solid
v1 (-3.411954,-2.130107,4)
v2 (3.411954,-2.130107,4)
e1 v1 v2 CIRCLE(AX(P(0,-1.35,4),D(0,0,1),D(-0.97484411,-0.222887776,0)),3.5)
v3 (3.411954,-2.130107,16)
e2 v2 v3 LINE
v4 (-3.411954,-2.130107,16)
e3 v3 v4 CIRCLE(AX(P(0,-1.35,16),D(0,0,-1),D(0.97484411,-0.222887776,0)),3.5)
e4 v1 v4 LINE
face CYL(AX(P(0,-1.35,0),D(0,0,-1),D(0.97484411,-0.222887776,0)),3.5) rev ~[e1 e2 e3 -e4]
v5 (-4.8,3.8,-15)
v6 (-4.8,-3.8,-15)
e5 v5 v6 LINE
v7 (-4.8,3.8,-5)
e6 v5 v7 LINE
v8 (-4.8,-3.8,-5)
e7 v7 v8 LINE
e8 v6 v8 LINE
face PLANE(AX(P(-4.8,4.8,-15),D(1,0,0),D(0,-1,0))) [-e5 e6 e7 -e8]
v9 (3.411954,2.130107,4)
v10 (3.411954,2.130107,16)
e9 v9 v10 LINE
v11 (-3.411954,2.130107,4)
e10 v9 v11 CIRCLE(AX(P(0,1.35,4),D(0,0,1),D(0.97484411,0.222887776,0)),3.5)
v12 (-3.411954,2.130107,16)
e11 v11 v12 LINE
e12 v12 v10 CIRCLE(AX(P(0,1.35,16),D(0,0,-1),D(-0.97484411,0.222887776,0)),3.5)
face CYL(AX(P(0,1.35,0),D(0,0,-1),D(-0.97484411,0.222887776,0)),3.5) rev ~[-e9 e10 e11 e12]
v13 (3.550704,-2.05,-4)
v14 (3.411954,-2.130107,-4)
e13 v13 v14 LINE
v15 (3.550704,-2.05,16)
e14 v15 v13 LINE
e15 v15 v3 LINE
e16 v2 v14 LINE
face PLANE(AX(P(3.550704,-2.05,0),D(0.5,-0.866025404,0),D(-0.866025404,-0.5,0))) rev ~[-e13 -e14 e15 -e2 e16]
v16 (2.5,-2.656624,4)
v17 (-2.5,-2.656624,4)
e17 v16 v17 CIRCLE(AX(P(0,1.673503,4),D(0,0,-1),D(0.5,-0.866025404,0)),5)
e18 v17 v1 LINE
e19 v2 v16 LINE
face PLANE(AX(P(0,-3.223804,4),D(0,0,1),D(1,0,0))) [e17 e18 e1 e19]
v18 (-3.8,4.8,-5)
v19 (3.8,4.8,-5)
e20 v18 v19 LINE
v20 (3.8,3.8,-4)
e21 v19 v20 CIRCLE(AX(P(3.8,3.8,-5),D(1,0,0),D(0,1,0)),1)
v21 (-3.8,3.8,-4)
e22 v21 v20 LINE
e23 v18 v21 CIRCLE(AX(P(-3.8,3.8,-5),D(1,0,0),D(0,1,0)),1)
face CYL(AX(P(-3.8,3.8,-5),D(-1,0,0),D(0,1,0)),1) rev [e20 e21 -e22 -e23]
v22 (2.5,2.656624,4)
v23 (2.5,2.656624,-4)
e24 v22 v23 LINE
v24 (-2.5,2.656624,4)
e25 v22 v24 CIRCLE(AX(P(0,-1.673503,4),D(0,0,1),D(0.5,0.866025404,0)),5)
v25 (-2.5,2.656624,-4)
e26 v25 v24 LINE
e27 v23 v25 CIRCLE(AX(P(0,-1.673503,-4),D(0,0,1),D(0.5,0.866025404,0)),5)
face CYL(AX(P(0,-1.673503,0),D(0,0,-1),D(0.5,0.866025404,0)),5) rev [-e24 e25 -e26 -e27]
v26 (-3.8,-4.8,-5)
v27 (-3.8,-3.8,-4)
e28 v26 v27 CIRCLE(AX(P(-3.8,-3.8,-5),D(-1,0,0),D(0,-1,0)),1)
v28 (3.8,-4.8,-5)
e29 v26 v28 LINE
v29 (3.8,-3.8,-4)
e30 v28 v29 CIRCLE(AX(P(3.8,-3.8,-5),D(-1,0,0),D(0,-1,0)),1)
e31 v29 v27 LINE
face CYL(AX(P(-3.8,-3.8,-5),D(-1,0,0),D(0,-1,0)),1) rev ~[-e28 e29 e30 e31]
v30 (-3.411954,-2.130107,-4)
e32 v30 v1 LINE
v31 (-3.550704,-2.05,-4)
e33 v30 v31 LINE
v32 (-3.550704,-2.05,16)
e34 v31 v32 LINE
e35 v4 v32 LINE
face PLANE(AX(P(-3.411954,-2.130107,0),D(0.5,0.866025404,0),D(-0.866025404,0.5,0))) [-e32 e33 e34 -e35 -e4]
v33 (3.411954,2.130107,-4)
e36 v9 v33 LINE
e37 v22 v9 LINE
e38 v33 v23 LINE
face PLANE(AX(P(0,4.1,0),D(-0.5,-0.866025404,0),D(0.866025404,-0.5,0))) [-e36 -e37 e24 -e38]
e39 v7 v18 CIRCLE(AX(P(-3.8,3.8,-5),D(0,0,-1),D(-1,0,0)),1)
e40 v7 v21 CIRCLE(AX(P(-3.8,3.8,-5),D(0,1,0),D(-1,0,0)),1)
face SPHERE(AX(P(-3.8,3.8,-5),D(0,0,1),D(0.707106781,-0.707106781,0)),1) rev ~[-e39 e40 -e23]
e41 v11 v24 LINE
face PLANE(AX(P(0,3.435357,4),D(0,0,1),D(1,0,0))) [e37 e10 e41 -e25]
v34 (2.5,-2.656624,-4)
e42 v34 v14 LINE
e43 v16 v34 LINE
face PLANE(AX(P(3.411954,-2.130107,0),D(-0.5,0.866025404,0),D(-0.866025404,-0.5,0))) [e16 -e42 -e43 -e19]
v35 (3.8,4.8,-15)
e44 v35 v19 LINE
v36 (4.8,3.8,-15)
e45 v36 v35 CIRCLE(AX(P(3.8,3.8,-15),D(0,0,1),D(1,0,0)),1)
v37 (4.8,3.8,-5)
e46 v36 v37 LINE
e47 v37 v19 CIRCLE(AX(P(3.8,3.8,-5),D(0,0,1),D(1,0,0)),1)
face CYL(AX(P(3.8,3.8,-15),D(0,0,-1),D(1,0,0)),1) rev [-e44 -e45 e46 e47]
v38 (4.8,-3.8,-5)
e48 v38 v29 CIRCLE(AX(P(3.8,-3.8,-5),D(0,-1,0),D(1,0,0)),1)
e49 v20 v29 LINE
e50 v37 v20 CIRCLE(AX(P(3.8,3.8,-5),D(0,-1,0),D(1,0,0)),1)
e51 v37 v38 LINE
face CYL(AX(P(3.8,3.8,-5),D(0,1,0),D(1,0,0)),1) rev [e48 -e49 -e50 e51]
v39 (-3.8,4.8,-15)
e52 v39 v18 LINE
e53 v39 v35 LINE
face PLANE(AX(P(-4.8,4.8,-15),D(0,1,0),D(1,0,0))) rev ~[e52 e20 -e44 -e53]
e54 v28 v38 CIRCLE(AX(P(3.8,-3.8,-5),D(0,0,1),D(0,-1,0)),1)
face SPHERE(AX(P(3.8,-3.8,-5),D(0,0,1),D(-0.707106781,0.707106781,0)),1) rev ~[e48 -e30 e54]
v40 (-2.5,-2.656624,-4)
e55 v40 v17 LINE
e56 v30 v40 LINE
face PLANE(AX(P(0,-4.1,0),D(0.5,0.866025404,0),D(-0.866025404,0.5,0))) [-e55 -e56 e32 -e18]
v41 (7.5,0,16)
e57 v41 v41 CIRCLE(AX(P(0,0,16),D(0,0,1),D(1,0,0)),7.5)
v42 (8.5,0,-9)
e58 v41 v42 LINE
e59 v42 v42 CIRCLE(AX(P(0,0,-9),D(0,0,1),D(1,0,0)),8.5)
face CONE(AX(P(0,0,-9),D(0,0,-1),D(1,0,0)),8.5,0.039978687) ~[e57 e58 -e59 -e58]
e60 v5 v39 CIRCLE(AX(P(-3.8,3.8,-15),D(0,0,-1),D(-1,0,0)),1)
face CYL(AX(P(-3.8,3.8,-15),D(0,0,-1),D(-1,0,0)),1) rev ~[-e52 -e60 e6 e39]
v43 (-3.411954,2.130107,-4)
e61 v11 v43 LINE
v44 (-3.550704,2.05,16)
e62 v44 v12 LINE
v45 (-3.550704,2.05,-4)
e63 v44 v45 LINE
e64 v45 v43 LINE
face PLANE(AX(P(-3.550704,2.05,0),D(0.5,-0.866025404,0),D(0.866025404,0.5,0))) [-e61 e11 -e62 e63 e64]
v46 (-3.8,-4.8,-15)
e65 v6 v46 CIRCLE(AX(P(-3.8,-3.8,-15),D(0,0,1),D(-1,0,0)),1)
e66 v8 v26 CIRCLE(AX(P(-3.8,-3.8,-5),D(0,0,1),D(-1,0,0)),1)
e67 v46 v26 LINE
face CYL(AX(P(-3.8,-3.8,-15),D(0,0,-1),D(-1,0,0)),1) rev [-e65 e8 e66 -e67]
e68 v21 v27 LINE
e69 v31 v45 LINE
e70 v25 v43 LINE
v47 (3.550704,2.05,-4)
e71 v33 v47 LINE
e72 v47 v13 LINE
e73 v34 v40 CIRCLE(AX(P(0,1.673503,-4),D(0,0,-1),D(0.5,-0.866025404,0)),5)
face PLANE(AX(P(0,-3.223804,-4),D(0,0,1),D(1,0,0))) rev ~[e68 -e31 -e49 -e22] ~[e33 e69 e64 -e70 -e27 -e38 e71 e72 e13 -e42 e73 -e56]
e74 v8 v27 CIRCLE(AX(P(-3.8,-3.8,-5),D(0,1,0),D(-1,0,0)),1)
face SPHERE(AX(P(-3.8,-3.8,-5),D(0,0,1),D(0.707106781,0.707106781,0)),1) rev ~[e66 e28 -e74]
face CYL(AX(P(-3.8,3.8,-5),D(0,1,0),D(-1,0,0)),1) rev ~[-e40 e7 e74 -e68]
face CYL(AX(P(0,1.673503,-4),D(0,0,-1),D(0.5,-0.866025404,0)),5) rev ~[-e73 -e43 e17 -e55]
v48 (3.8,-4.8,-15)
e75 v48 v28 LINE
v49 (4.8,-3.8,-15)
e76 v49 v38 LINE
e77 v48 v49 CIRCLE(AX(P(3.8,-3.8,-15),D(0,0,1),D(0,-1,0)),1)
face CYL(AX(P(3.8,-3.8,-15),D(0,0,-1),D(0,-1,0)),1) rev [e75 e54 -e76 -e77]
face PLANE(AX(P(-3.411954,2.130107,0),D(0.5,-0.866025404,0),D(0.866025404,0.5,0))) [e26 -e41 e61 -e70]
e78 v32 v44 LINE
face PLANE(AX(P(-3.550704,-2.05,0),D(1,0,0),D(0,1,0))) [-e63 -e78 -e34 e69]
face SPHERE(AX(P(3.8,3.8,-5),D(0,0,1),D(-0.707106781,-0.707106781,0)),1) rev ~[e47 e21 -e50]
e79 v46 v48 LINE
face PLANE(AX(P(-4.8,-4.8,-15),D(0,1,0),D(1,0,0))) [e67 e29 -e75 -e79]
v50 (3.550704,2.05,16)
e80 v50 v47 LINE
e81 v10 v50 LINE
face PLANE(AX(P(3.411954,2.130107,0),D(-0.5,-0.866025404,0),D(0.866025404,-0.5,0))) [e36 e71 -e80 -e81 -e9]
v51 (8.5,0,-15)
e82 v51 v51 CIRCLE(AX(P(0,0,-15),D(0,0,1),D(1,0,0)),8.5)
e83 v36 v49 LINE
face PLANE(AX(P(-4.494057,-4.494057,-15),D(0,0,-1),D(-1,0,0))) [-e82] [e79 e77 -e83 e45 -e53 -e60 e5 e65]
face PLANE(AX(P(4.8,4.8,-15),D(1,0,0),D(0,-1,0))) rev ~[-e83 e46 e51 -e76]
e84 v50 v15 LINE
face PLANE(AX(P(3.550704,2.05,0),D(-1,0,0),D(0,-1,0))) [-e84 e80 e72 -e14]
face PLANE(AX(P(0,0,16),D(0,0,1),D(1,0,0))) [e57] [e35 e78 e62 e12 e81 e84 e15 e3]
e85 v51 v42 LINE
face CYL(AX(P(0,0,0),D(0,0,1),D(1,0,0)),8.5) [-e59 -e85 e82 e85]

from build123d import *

# Parameters (mm, degrees)
F0_R         = 8.5
F1_DEPTH     = 16
F2_DEPTH     = 4
F3_DEPTH     = 15
F4_W         = 9.6
F4_H         = 9.6
F5_DEPTH     = 11
F6_T1_DEPTH  = 10
F6_T3_DEPTH  = 7.6
F6_T5_DEPTH  = 7.6
F6_S9_W      = 1.02
F6_S9_H      = 1.02
F6_T10_DEPTH = 1.02
F6_S15_W     = 1.02
F6_S15_H     = 1.02
F6_T16_DEPTH = 1.02
F6_S21_W     = 1.02
F6_S21_H     = 1.02
F6_T22_DEPTH = 1.02
F6_S27_W     = 1.02
F6_S27_H     = 1.02
F6_T28_DEPTH = 1.02
F7_SIZE2     = 25
F7_SIZE      = 1
F8_T1_DEPTH  = 4
F8_T3_DEPTH  = 4
F9_DEPTH     = 25


# Not quite as in the source:
# - a fillet or chamfer that OpenCascade refuses, or shapes differently, is made with other operations: its cross-section is extruded or revolved along the edge and cut away or added


with BuildPart() as f1:
    # F0 (on Top) → F1 (new body)
    with BuildSketch(Plane.XY):
        Circle(F0_R)
        with BuildLine():
            Line((3.4119543857, 2.130107217), (3.5507041555, 2.05))
            Line((3.5507041555, 2.05), (3.5507041555, -2.05))
            Line((3.5507041555, -2.05), (3.4119543857, -2.130107217))
            ThreePointArc((3.4119543857, -2.130107217), (0, -4.85), (-3.4119543857, -2.130107217))
            Line((-3.4119543857, -2.130107217), (-3.5507041555, -2.05))
            Line((-3.5507041555, -2.05), (-3.5507041555, 2.05))
            Line((-3.5507041555, 2.05), (-3.4119543857, 2.130107217))
            ThreePointArc((-3.4119543857, 2.130107217), (0, 4.85), (3.4119543857, 2.130107217))
        make_face(mode=Mode.SUBTRACT)
    extrude(amount=F1_DEPTH)

    # F0 (on Top) → F2 (join)
    with BuildSketch(Plane.XY):
        with BuildLine():
            Line((0, 4.1), (3.4119543857, 2.130107217))
            ThreePointArc((3.4119543857, 2.130107217), (0, 4.85), (-3.4119543857, 2.130107217))
            Line((-3.4119543857, 2.130107217), (0, 4.1))
        make_face()
        with BuildLine():
            ThreePointArc((-3.4119543857, -2.130107217), (0, -4.85), (3.4119543857, -2.130107217))
            Line((3.4119543857, -2.130107217), (0, -4.1))
            Line((0, -4.1), (-3.4119543857, -2.130107217))
        make_face()
    extrude(amount=F2_DEPTH)

    # F0 (on Top) → F3 (join)
    with BuildSketch(Plane.XY):
        Circle(F0_R)
        with BuildLine():
            Line((3.4119543857, 2.130107217), (3.5507041555, 2.05))
            Line((3.5507041555, 2.05), (3.5507041555, -2.05))
            Line((3.5507041555, -2.05), (3.4119543857, -2.130107217))
            ThreePointArc((3.4119543857, -2.130107217), (0, -4.85), (-3.4119543857, -2.130107217))
            Line((-3.4119543857, -2.130107217), (-3.5507041555, -2.05))
            Line((-3.5507041555, -2.05), (-3.5507041555, 2.05))
            Line((-3.5507041555, 2.05), (-3.4119543857, 2.130107217))
            ThreePointArc((-3.4119543857, 2.130107217), (0, 4.85), (3.4119543857, 2.130107217))
        make_face(mode=Mode.SUBTRACT)
        with BuildLine():
            ThreePointArc((-3.5, 1.35), (-3.4779189431, 1.7425300307), (-3.4119543857, 2.130107217))
            Line((-3.4119543857, 2.130107217), (-3.5507041555, 2.05))
            Line((-3.5507041555, 2.05), (-3.5507041555, -2.05))
            Line((-3.5507041555, -2.05), (-3.4119543857, -2.130107217))
            ThreePointArc((-3.4119543857, -2.130107217), (-3.4779189431, -1.7425300307), (-3.5, -1.35))
            Line((-3.5, -1.35), (-3.5, 1.35))
        make_face()
        with BuildLine():
            Line((0, 4.1), (3.4119543857, 2.130107217))
            ThreePointArc((3.4119543857, 2.130107217), (0, 4.85), (-3.4119543857, 2.130107217))
            Line((-3.4119543857, 2.130107217), (0, 4.1))
        make_face()
        with BuildLine():
            ThreePointArc((-3.4119543857, -2.130107217), (0, -4.85), (3.4119543857, -2.130107217))
            Line((3.4119543857, -2.130107217), (0, -4.1))
            Line((0, -4.1), (-3.4119543857, -2.130107217))
        make_face()
        with BuildLine():
            Line((3.5507041555, -2.05), (3.5507041555, 2.05))
            Line((3.5507041555, 2.05), (3.4119543857, 2.130107217))
            ThreePointArc((3.4119543857, 2.130107217), (3.4779189431, 1.7425300307), (3.5, 1.35))
            Line((3.5, 1.35), (3.5, -1.35))
            ThreePointArc((3.5, -1.35), (3.4779189431, -1.7425300307), (3.4119543857, -2.130107217))
            Line((3.4119543857, -2.130107217), (3.5507041555, -2.05))
        make_face()
    extrude(amount=-F3_DEPTH)

    # F4 (on face) → F5 (cut)
    with BuildSketch(Plane(origin=(0, 0, -15), x_dir=(1, 0, 0), z_dir=(0, 0, -1))):
        Rectangle(F4_W, F4_H)
        with BuildLine():
            Line((-3.4119543857, 2.130107217), (0, 4.1))
            Line((0, 4.1), (3.4119543857, 2.130107217))
            ThreePointArc((3.4119543857, 2.130107217), (3.4779189431, 1.7425300307), (3.5, 1.35))
            Line((3.5, 1.35), (3.5, -1.35))
            ThreePointArc((3.5, -1.35), (3.4779189431, -1.7425300307), (3.4119543857, -2.130107217))
            Line((3.4119543857, -2.130107217), (0, -4.1))
            Line((0, -4.1), (-3.4119543857, -2.130107217))
            ThreePointArc((-3.4119543857, -2.130107217), (-3.4779189431, -1.7425300307), (-3.5, -1.35))
            Line((-3.5, -1.35), (-3.5, 1.35))
            ThreePointArc((-3.5, 1.35), (-3.4779189431, 1.7425300307), (-3.4119543857, 2.130107217))
        make_face(mode=Mode.SUBTRACT)
    extrude(amount=-F5_DEPTH, mode=Mode.SUBTRACT)

    # F6: fillet of radius 1 on 8 edges, made by hand

    # F6_s2 → F6_t1 (join)
    with BuildSketch(Plane.XY.offset(-15)):
        with BuildLine():
            ThreePointArc((-4.8, -3.8), (-4.5071067812, -4.5071067812), (-3.8, -4.8))
            Line((-3.8, -4.8), (-4.8, -4.8))
            Line((-4.8, -4.8), (-4.8, -3.8))
        make_face()
        with BuildLine():
            ThreePointArc((-4.8, 3.8), (-4.5071067812, 4.5071067812), (-3.8, 4.8))
            Line((-3.8, 4.8), (-4.8, 4.8))
            Line((-4.8, 4.8), (-4.8, 3.8))
        make_face()
        with BuildLine():
            ThreePointArc((3.8, -4.8), (4.5071067812, -4.5071067812), (4.8, -3.8))
            Line((4.8, -3.8), (4.8, -4.8))
            Line((4.8, -4.8), (3.8, -4.8))
        make_face()
        with BuildLine():
            ThreePointArc((4.8, 3.8), (4.5071067812, 4.5071067812), (3.8, 4.8))
            Line((3.8, 4.8), (4.8, 4.8))
            Line((4.8, 4.8), (4.8, 3.8))
        make_face()
    extrude(amount=F6_T1_DEPTH)

    # F6_s4 → F6_t3 (join)
    with BuildSketch(Plane.YZ.offset(-3.8)):
        with BuildLine():
            ThreePointArc((4.8, -5), (4.5071067812, -4.2928932188), (3.8, -4))
            Line((3.8, -4), (4.8, -4))
            Line((4.8, -4), (4.8, -5))
        make_face()
        with BuildLine():
            ThreePointArc((-4.8, -5), (-4.5071067812, -4.2928932188), (-3.8, -4))
            Line((-3.8, -4), (-4.8, -4))
            Line((-4.8, -4), (-4.8, -5))
        make_face()
    extrude(amount=F6_T3_DEPTH)

    # F6_s6 → F6_t5 (join)
    with BuildSketch(Plane.XZ.offset(-3.8)):
        with BuildLine():
            ThreePointArc((-4.8, -5), (-4.5071067812, -4.2928932188), (-3.8, -4))
            Line((-3.8, -4), (-4.8, -4))
            Line((-4.8, -4), (-4.8, -5))
        make_face()
        with BuildLine():
            ThreePointArc((4.8, -5), (4.5071067812, -4.2928932188), (3.8, -4))
            Line((3.8, -4), (4.8, -4))
            Line((4.8, -4), (4.8, -5))
        make_face()
    extrude(amount=F6_T5_DEPTH)


with BuildPart() as f6_tool8:
    # F6_s9 → F6_t10 (new body)
    with BuildSketch(Plane.XY.offset(-5)):
        with Locations((-4.31, -4.31)):
            Rectangle(F6_S9_W, F6_S9_H)
    extrude(amount=F6_T10_DEPTH)

    # F6_s11 → F6_t12 (revolve, cut)
    with BuildSketch(Plane(origin=(-3.8, -3.8, -5), x_dir=(0.7071067812, 0.7071067812, 0), z_dir=(0.7071067812, -0.7071067812, 0))):
        with BuildLine():
            ThreePointArc((0, -1), (1, 0), (0, 1))
            Line((0, 1), (0, -1))
        make_face()
    revolve(axis=Axis((-3.8, -3.8, -5), (0, 0, 1)), mode=Mode.SUBTRACT)


with BuildPart() as f1_1:
    add(f1.part)

    # F6_t7: union F6_tool8
    add(f6_tool8.part)


with BuildPart() as f6_tool14:
    # F6_s15 → F6_t16 (new body)
    with BuildSketch(Plane.XY.offset(-5)):
        with Locations((-4.31, 4.31)):
            Rectangle(F6_S15_W, F6_S15_H)
    extrude(amount=F6_T16_DEPTH)

    # F6_s17 → F6_t18 (revolve, cut)
    with BuildSketch(Plane(origin=(-3.8, 3.8, -5), x_dir=(0.7071067812, -0.7071067812, 0), z_dir=(-0.7071067812, -0.7071067812, 0))):
        with BuildLine():
            ThreePointArc((0, -1), (1, 0), (0, 1))
            Line((0, 1), (0, -1))
        make_face()
    revolve(axis=Axis((-3.8, 3.8, -5), (0, 0, 1)), mode=Mode.SUBTRACT)


with BuildPart() as f1_2:
    add(f1_1.part)

    # F6_t13: union F6_tool14
    add(f6_tool14.part)


with BuildPart() as f6_tool20:
    # F6_s21 → F6_t22 (new body)
    with BuildSketch(Plane.XY.offset(-5)):
        with Locations((4.31, -4.31)):
            Rectangle(F6_S21_W, F6_S21_H)
    extrude(amount=F6_T22_DEPTH)

    # F6_s23 → F6_t24 (revolve, cut)
    with BuildSketch(Plane(origin=(3.8, -3.8, -5), x_dir=(-0.7071067812, 0.7071067812, 0), z_dir=(0.7071067812, 0.7071067812, 0))):
        with BuildLine():
            ThreePointArc((0, -1), (1, 0), (0, 1))
            Line((0, 1), (0, -1))
        make_face()
    revolve(axis=Axis((3.8, -3.8, -5), (0, 0, 1)), mode=Mode.SUBTRACT)


with BuildPart() as f1_3:
    add(f1_2.part)

    # F6_t19: union F6_tool20
    add(f6_tool20.part)


with BuildPart() as f6_tool26:
    # F6_s27 → F6_t28 (new body)
    with BuildSketch(Plane.XY.offset(-5)):
        with Locations((4.31, 4.31)):
            Rectangle(F6_S27_W, F6_S27_H)
    extrude(amount=F6_T28_DEPTH)

    # F6_s29 → F6_t30 (revolve, cut)
    with BuildSketch(Plane(origin=(3.8, 3.8, -5), x_dir=(-0.7071067812, -0.7071067812, 0), z_dir=(-0.7071067812, 0.7071067812, 0))):
        with BuildLine():
            ThreePointArc((0, -1), (1, 0), (0, 1))
            Line((0, 1), (0, -1))
        make_face()
    revolve(axis=Axis((3.8, 3.8, -5), (0, 0, 1)), mode=Mode.SUBTRACT)


with BuildPart() as f1_4:
    add(f1_3.part)

    # F6_t25: union F6_tool26
    add(f6_tool26.part)

    # F7
    f7_edges = [f1_4.edges().sort_by_distance(p)[0] for p in [
        (-8.5, 0, 16),
    ]]
    f7_side = f1_4.faces().sort_by_distance((-8.259584, 0, 16))[0]
    chamfer(f7_edges, length=F7_SIZE, length2=F7_SIZE2, reference=f7_side)

    # F8: fillet of radius 5 on 4 edges, made by hand

    # F8_s2 → F8_t1 (join)
    with BuildSketch(Plane.XY):
        with BuildLine():
            ThreePointArc((2.5, -2.656624327), (0, -3.3264973081), (-2.5, -2.656624327))
            Line((-2.5, -2.656624327), (0, -4.1))
            Line((0, -4.1), (2.5, -2.656624327))
        make_face()
        with BuildLine():
            ThreePointArc((2.5, 2.656624327), (0, 3.3264973081), (-2.5, 2.656624327))
            Line((-2.5, 2.656624327), (0, 4.1))
            Line((0, 4.1), (2.5, 2.656624327))
        make_face()
    extrude(amount=F8_T1_DEPTH)

    # F8_s4 → F8_t3 (join)
    with BuildSketch(Plane.XY.offset(-4)):
        with BuildLine():
            ThreePointArc((2.5, -2.656624327), (0, -3.3264973081), (-2.5, -2.656624327))
            Line((-2.5, -2.656624327), (0, -4.1))
            Line((0, -4.1), (2.5, -2.656624327))
        make_face()
        with BuildLine():
            ThreePointArc((2.5, 2.656624327), (0, 3.3264973081), (-2.5, 2.656624327))
            Line((-2.5, 2.656624327), (0, 4.1))
            Line((0, 4.1), (2.5, 2.656624327))
        make_face()
    extrude(amount=F8_T3_DEPTH)

    # F9 (cut): faces of the model
    f9_faces = [f1_4.faces().sort_by_distance(p)[0] for p in [
        (3.5168739038, 0, 0),
        (-3.5168739038, 0, 0),
    ]]
    extrude(f9_faces, amount=-F9_DEPTH, mode=Mode.SUBTRACT)


solid = f1_4.part
